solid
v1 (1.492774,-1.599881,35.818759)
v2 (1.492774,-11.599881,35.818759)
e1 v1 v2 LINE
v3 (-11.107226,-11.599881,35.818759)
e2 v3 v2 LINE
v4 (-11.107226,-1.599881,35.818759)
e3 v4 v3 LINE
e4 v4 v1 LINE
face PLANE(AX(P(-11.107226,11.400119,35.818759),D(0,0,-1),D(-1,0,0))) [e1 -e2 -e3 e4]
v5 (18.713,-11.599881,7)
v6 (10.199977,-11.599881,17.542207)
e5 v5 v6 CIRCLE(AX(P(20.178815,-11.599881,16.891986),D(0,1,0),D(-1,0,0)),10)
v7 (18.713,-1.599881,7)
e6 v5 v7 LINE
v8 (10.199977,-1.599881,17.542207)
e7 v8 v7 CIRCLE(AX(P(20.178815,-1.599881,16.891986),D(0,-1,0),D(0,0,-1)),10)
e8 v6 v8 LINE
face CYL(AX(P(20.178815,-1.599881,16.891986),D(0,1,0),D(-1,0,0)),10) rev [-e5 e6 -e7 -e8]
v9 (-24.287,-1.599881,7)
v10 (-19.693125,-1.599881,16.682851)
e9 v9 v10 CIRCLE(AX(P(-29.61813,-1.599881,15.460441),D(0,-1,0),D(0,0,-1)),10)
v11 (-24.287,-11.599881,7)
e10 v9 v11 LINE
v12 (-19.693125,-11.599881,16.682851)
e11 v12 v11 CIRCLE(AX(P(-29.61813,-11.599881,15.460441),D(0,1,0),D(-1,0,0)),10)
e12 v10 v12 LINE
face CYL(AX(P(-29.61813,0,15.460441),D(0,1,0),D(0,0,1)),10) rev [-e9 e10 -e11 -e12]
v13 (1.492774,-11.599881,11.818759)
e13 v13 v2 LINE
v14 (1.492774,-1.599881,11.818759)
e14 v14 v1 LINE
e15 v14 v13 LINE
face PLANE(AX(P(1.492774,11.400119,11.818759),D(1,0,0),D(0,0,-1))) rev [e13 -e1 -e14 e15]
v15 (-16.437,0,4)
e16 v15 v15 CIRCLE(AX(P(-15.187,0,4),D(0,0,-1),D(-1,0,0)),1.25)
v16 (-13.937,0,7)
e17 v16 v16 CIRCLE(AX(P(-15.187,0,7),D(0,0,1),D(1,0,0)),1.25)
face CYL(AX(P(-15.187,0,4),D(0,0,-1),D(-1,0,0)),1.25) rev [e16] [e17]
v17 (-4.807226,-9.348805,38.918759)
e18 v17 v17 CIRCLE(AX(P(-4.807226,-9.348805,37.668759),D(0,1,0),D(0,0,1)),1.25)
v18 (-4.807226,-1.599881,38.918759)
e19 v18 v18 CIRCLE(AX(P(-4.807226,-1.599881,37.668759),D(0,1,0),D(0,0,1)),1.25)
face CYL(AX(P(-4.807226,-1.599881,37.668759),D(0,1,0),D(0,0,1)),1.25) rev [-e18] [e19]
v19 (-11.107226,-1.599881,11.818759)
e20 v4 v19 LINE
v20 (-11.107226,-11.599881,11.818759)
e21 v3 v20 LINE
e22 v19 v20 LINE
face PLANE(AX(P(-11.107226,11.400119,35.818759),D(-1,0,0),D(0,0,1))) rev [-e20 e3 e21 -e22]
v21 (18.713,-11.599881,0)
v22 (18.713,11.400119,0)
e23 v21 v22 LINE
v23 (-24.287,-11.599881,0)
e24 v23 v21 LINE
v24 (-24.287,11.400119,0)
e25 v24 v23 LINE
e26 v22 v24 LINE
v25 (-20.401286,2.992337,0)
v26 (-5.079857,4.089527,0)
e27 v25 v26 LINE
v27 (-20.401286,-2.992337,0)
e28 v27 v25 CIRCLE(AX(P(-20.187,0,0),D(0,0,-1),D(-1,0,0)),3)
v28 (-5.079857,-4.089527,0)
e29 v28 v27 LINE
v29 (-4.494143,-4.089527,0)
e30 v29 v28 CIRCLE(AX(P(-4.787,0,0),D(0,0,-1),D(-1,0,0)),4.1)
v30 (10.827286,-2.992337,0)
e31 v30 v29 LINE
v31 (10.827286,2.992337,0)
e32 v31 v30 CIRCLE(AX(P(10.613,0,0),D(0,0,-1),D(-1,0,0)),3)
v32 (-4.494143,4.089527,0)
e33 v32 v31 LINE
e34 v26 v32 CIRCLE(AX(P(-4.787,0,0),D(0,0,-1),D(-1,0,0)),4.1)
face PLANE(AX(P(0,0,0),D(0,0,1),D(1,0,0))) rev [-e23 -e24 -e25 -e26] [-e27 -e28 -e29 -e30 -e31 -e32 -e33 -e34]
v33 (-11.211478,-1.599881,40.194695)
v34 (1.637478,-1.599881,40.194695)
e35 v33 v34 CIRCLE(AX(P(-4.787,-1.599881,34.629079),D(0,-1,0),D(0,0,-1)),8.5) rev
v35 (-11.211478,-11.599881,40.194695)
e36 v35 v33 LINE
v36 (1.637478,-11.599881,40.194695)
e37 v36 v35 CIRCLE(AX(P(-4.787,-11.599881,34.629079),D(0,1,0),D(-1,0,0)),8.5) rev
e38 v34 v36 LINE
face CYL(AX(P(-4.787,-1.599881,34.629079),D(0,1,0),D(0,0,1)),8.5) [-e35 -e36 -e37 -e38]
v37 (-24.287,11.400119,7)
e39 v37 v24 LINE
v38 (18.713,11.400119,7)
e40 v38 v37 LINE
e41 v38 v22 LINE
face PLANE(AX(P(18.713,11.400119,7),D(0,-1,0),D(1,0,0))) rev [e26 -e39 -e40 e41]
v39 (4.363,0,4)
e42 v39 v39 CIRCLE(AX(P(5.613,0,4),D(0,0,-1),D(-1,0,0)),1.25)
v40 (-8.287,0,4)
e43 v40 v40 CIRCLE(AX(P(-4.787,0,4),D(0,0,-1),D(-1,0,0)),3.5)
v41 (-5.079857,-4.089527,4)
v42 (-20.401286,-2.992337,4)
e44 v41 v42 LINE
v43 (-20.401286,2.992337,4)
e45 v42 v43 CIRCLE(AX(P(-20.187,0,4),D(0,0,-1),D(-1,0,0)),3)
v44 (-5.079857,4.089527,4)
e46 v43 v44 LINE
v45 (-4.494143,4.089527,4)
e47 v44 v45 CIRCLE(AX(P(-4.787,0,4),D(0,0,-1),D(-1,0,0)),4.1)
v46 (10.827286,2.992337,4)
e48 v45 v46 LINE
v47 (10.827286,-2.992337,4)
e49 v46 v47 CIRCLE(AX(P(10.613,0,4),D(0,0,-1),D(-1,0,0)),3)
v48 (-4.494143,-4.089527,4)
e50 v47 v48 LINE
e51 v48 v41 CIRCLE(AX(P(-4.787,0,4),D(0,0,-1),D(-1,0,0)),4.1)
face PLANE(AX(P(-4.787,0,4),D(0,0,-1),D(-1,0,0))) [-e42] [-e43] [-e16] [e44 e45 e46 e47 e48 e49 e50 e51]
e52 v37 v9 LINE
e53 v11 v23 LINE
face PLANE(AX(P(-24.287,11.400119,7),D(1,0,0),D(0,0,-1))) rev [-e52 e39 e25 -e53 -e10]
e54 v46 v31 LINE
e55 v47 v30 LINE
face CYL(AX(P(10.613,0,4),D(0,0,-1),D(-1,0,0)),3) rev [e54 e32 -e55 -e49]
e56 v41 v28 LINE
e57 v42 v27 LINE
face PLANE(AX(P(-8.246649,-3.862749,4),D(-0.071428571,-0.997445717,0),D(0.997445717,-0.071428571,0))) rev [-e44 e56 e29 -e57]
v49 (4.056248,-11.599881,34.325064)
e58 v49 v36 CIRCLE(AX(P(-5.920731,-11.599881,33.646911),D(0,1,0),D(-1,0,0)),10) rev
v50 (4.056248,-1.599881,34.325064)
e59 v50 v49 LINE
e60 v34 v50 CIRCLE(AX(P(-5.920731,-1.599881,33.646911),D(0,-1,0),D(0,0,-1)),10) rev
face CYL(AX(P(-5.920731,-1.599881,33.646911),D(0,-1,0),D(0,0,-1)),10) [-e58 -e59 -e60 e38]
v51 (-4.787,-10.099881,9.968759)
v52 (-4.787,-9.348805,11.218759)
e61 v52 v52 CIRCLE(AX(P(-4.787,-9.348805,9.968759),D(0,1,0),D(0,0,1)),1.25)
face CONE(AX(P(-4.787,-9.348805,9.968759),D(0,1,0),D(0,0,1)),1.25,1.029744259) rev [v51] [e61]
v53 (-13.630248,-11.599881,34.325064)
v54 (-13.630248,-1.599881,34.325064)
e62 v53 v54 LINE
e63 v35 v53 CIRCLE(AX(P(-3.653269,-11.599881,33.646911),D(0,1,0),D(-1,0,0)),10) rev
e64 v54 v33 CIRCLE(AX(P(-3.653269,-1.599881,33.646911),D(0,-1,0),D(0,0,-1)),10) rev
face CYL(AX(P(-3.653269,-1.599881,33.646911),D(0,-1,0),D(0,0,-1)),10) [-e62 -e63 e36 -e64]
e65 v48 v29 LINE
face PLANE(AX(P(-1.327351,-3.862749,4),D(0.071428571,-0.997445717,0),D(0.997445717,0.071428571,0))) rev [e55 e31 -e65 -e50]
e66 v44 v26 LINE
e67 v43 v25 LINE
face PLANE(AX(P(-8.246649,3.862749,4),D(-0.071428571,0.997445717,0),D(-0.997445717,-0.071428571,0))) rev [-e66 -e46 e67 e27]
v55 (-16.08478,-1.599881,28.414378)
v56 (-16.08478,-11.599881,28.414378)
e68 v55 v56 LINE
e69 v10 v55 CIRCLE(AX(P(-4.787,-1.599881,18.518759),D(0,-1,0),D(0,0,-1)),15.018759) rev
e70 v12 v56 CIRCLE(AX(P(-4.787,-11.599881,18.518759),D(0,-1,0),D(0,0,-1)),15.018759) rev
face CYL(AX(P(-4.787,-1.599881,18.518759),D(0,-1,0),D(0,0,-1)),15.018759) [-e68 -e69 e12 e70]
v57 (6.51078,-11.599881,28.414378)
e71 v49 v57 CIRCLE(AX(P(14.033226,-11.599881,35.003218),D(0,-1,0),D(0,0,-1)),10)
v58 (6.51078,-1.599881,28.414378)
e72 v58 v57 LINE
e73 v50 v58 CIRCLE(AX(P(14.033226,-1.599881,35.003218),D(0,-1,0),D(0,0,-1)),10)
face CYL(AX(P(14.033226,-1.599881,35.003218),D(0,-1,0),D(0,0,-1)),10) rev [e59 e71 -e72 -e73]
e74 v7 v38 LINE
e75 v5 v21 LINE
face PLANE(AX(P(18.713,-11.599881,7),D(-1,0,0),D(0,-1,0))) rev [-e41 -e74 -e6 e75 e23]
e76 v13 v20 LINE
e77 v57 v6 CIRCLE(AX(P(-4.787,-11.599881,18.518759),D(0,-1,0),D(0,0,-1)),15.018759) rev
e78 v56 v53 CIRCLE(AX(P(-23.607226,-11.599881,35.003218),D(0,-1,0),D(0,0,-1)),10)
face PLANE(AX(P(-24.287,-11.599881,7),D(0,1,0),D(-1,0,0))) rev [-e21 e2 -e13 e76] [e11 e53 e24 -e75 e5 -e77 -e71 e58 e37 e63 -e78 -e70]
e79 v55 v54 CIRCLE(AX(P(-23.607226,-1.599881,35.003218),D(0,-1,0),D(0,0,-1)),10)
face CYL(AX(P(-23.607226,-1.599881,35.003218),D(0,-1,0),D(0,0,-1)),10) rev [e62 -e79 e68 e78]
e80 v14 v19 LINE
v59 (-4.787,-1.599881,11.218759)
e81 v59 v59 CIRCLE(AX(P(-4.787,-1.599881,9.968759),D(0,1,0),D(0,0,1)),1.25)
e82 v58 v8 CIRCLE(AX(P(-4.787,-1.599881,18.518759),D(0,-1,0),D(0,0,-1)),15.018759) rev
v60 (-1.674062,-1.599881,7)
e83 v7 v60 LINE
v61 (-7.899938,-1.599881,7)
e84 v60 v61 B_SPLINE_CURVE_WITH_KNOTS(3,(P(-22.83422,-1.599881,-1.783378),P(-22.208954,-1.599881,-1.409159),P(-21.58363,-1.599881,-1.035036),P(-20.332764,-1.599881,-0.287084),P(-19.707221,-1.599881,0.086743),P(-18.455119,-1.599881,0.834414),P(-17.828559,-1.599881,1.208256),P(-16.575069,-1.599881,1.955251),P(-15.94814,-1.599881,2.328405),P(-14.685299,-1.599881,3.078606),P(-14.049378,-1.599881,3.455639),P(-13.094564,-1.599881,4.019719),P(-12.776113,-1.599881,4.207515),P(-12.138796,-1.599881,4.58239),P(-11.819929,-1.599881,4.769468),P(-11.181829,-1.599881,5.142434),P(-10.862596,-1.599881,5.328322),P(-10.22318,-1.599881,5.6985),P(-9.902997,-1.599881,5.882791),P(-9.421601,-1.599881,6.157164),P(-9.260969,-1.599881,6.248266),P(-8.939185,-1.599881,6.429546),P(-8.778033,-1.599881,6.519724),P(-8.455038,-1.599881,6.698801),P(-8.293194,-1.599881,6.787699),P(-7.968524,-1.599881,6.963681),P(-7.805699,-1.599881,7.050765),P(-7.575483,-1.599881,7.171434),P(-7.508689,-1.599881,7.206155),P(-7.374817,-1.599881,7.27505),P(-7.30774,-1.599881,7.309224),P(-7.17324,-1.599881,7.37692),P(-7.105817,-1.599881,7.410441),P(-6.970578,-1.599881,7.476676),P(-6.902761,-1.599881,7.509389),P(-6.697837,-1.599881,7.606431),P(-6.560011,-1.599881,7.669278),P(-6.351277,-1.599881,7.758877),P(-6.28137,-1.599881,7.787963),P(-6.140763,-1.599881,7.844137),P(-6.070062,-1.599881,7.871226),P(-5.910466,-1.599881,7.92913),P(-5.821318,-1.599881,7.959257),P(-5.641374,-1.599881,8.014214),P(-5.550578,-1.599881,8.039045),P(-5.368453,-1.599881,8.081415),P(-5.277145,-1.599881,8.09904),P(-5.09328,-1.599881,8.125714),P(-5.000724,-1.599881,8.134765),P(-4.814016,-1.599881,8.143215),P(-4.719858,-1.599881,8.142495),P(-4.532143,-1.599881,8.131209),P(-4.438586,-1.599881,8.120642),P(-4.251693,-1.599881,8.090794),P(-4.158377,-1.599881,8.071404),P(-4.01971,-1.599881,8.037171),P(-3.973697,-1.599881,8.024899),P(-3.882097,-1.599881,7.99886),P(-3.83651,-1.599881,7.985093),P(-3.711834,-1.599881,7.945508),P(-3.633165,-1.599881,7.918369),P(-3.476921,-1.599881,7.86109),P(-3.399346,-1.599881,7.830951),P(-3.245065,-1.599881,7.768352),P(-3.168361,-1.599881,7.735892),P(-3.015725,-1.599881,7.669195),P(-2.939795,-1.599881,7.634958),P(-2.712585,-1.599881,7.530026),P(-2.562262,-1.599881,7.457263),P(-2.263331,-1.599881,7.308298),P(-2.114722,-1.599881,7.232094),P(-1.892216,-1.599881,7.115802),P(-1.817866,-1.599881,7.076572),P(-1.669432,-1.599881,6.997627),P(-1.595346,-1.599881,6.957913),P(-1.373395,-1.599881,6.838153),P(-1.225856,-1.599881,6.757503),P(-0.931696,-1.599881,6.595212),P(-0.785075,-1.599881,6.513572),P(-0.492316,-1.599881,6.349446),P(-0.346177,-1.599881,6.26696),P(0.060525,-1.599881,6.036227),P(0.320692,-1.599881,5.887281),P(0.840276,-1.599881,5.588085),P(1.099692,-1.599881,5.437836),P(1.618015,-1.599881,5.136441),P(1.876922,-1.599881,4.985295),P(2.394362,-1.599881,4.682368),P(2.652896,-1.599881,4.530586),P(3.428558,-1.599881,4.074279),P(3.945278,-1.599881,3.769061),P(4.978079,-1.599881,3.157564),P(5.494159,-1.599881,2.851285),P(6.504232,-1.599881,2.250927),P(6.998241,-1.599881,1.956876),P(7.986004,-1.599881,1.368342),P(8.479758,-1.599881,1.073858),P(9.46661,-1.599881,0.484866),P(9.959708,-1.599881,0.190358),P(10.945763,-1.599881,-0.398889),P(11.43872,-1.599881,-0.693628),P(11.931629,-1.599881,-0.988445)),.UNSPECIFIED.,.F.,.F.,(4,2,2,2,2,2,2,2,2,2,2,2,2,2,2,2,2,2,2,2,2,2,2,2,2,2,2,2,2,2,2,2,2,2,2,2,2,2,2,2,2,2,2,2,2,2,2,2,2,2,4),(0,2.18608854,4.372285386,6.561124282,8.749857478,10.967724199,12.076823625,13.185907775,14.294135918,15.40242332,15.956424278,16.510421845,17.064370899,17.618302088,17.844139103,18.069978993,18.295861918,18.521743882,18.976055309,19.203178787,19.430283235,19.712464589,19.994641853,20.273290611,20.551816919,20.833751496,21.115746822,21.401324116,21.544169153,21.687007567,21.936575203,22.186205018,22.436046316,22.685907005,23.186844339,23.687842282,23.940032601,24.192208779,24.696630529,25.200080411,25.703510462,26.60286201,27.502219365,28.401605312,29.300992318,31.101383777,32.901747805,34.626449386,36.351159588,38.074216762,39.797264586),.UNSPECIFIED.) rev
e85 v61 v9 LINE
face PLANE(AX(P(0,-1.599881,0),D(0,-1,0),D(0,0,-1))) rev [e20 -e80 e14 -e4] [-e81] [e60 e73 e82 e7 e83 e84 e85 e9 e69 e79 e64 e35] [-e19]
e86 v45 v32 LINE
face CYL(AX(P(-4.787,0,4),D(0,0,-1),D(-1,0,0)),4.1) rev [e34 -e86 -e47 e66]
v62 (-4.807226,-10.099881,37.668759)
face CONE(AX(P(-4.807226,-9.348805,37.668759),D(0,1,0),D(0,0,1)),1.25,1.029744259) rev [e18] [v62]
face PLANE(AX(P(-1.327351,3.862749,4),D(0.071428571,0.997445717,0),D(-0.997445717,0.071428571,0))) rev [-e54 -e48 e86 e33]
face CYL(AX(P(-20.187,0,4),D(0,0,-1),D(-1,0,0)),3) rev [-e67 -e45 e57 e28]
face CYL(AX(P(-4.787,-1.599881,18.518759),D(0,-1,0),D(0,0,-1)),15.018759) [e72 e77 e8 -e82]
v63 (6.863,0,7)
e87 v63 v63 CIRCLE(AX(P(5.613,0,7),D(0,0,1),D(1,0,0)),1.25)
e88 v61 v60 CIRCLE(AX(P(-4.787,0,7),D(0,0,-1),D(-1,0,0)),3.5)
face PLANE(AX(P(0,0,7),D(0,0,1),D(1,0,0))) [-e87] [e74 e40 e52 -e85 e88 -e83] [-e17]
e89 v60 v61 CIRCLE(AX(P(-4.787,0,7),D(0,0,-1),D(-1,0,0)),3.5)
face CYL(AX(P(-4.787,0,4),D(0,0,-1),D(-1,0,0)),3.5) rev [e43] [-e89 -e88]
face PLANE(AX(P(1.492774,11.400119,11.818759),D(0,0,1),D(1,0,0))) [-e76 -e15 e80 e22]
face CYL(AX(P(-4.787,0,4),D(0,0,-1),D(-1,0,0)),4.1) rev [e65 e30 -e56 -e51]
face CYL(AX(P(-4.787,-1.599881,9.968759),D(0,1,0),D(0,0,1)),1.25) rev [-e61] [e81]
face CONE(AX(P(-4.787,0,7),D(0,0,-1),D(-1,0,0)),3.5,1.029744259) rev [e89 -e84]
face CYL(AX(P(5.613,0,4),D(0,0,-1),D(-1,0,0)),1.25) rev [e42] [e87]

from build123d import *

# Parameters (mm, degrees)
SKETCH1_W                 = 43
SKETCH1_H                 = 23
BOSS_EXTRUDE1_DEPTH       = 7
BOSS_EXTRUDE2_DEPTH       = 10
CUT_EXTRUDE1_DEPTH        = 4
M8X1_0_TAPPED_HOLE1_D     = 7
M8X1_0_TAPPED_HOLE1_DEPTH = 3
M8X1_0_TAPPED_HOLE1_TIP   = 2.103012167
M3X0_5_TAPPED_HOLE1_D     = 2.5
SKETCH10_W                = 24
SKETCH10_H                = 12.6
CUT_EXTRUDE2_DEPTH        = 65.606711792
M3X0_5_TAPPED_HOLE2_D     = 2.5
M3X0_5_TAPPED_HOLE2_DEPTH = 7.748924226
M3X0_5_TAPPED_HOLE2_TIP   = 0.751075774
FILLET2_R                 = 10
FILLET3_R                 = 10
FILLET4_R                 = 8.5


with BuildPart() as part:
    # Sketch1 → Boss-Extrude1 (new body)
    with BuildSketch(Plane.XY):
        with Locations((-2.787, -0.099880638)):
            Rectangle(SKETCH1_W, SKETCH1_H)
    extrude(amount=BOSS_EXTRUDE1_DEPTH)

    # Sketch9 → Boss-Extrude2 (add)
    with BuildSketch(Plane(origin=(-10, -11.599880638, 0), x_dir=(0, 0, 1), z_dir=(0, 1, 0))):
        with BuildLine():
            Line((43.646910996, 14.033226444), (35.00321795, 14.033226444))
            ThreePointArc((35.00321795, 14.033226444), (31.483591553, 14.673085952), (28.414378439, 16.510780439))
            ThreePointArc((28.414378439, 16.510780439), (3.5, 5.213), (28.414378439, -6.084780439))
            ThreePointArc((28.414378439, -6.084780439), (31.483591553, -4.247085952), (35.00321795, -3.607226444))
            Line((35.00321795, -3.607226444), (43.646910996, -3.607226444))
            Line((43.646910996, -3.607226444), (43.646910996, 14.033226444))
        make_face()
    extrude(amount=BOSS_EXTRUDE2_DEPTH)

    # Sketch2 → Cut-Extrude1 (cut)
    with BuildSketch(Plane(origin=(0, 0, 0), x_dir=(-1, 0, 0), z_dir=(0, 0, -1))):
        with BuildLine():
            Line((1.32735088, -3.862748758), (4.494142857, -4.089527441))
            ThreePointArc((4.494142857, -4.089527441), (4.787, -4.1), (5.079857143, -4.089527441))
            Line((5.079857143, -4.089527441), (8.24664912, -3.862748758))
            Line((8.24664912, -3.862748758), (20.401285714, -2.992337152))
            ThreePointArc((20.401285714, -2.992337152), (23.187, 0), (20.401285714, 2.992337152))
            Line((20.401285714, 2.992337152), (8.24664912, 3.862748758))
            Line((8.24664912, 3.862748758), (5.079857143, 4.089527441))
            ThreePointArc((5.079857143, 4.089527441), (4.787, 4.1), (4.494142857, 4.089527441))
            Line((4.494142857, 4.089527441), (1.32735088, 3.862748758))
            Line((1.32735088, 3.862748758), (-10.827285714, 2.992337152))
            ThreePointArc((-10.827285714, 2.992337152), (-13.613, 0), (-10.827285714, -2.992337152))
            Line((-10.827285714, -2.992337152), (1.32735088, -3.862748758))
        make_face()
    extrude(amount=-CUT_EXTRUDE1_DEPTH, mode=Mode.SUBTRACT)

    # M8x1.0 Tapped Hole1
    with Locations(Plane(origin=(0, 0, 4), x_dir=(-1, 0, 0), z_dir=(0, 0, -1))):
        with Locations((4.787, 0)):
            Hole(M8X1_0_TAPPED_HOLE1_D / 2, depth=M8X1_0_TAPPED_HOLE1_DEPTH)
            with Locations((0, 0, -(M8X1_0_TAPPED_HOLE1_DEPTH + M8X1_0_TAPPED_HOLE1_TIP / 2))):  # 118° drill point
                Cone(0, M8X1_0_TAPPED_HOLE1_D / 2, M8X1_0_TAPPED_HOLE1_TIP, mode=Mode.SUBTRACT)

    # M3x0.5 Tapped Hole1 (through all)
    with Locations(Plane(origin=(0, 0, 4), x_dir=(-1, 0, 0), z_dir=(0, 0, -1))):
        with Locations((15.187, 0), (-5.613, 0), (4.787, 0)):
            Hole(M3X0_5_TAPPED_HOLE1_D / 2)

    # Sketch10 → Cut-Extrude2 (cut, through all)
    with BuildSketch(Plane(origin=(-23, -11.599880638, 0), x_dir=(0, 0, -1), z_dir=(0, 1, 0))):
        with Locations((-23.818759101, -18.192773556)):
            Rectangle(SKETCH10_W, SKETCH10_H)
    extrude(amount=CUT_EXTRUDE2_DEPTH, mode=Mode.SUBTRACT)

    # M3x0.5 Tapped Hole2
    with Locations(Plane(origin=(-13, -1.599880638, 0), x_dir=(0, 0, -1), z_dir=(0, 1, 0))):
        with Locations((-37.668759101, -8.192773556), (-9.968759101, -8.213)):
            Hole(M3X0_5_TAPPED_HOLE2_D / 2, depth=M3X0_5_TAPPED_HOLE2_DEPTH)
            with Locations((0, 0, -(M3X0_5_TAPPED_HOLE2_DEPTH + M3X0_5_TAPPED_HOLE2_TIP / 2))):  # 118° drill point
                Cone(0, M3X0_5_TAPPED_HOLE2_D / 2, M3X0_5_TAPPED_HOLE2_TIP, mode=Mode.SUBTRACT)

    # Fillet2
    # the kernel refuses this fillet: 10 mm, written as the material it adds along each edge
    with BuildSketch(Plane(origin=(4.850495199, -1.599880638, 7), x_dir=(1, 0, 0), z_dir=(0, -1, 0))) as fillet2_piece_1:
        with BuildLine():
            CenterArc((15.328319752, 9.891985975), FILLET2_R, 176.271875941, 85.299253253)
            Line((5.349481533, 10.542207323), (5.149904768, 10.55521175))
            ThreePointArc((5.149904768, 10.55521175), (3.577273835, 4.813127088), (-0.128339434, 0.153391622))
            Line((-0.128339434, 0.153391622), (0, -0.2))
            ThreePointArc((0, -0.2), (6.931252401, -0.2), (13.833188502, -0.19783972))
            Line((13.833188502, -0.19783972), (13.862504801, 0))
        make_face()
    extrude(amount=10)
    with BuildSketch(Plane(origin=(-14.424495199, -1.599880638, 7), x_dir=(-1, 0, 0), z_dir=(0, -1, 0))) as fillet2_piece_2:
        with BuildLine():
            CenterArc((15.193634372, -8.460440739), FILLET2_R, 122.216027092, 64.805428204)
            Line((5.26862991, -9.682850831), (5.070129821, -9.707299033))
            ThreePointArc((5.070129821, -9.707299033), (3.379125123, -4.436159529), (-0.128339434, -0.153391622))
            Line((-0.128339434, -0.153391622), (0, 0.2))
            ThreePointArc((0, 0.2), (4.931252401, 0.2), (9.75588221, 0.169208815))
            Line((9.75588221, 0.169208815), (9.862504801, 0))
        make_face()
    extrude(amount=10)

    # Fillet3
    # the kernel refuses this fillet: 10 mm, written as the material it takes off along each edge
    with BuildSketch(Plane(origin=(-13.607226444, -36.484775111, 43.646910996), x_dir=(1, 0, 0), z_dir=(0, 1, 0))) as fillet3_piece_1:
        with BuildLine():
            CenterArc((9.953957789, 10), FILLET3_R, 183.8885176, 86.1114824)
            Line((-0.023021105, 9.321846523), (-1.020718995, 9.254031175))
            ThreePointArc((-1.020718995, 9.254031175), (-1, 8.643693046), (-1, 0))
            Line((-1, 0), (0, -1))
            Line((0, -1), (9.953957789, -1))
            Line((9.953957789, -1), (9.953957789, 0))
        make_face()
    extrude(amount=59.769788945, mode=Mode.SUBTRACT)
    with BuildSketch(Plane(origin=(4.033226444, -36.484775111, 43.646910996), x_dir=(0.0024695788781197194, 0, -0.9999969505854329), z_dir=(0, 1, 0))) as fillet3_piece_2:
        with BuildLine():
            CenterArc((9.975387422, 9.978623224), FILLET3_R, 180.141496591, 86.1114824)
            Line((-0.024582084, 9.953927435), (-1.024579034, 9.951457856))
            Line((-1.024579034, 9.951457856), (-0.999996951, -0.002469579))
            Line((-0.999996951, -0.002469579), (0.002469579, -0.999996951))
            ThreePointArc((0.002469579, -0.999996951), (8.646136267, -0.978650669), (9.256523702, -0.997862322))
            Line((9.256523702, -0.997862322), (9.321874949, 0))
        make_face()
    extrude(amount=59.769788945, mode=Mode.SUBTRACT)

    # Fillet4
    fillet4_edges = [part.edges().sort_by_distance(p)[0] for p in [
        (-4.787, -6.599880638, 43.582435806),
    ]]
    fillet(fillet4_edges, radius=FILLET4_R)


solid = part.part
